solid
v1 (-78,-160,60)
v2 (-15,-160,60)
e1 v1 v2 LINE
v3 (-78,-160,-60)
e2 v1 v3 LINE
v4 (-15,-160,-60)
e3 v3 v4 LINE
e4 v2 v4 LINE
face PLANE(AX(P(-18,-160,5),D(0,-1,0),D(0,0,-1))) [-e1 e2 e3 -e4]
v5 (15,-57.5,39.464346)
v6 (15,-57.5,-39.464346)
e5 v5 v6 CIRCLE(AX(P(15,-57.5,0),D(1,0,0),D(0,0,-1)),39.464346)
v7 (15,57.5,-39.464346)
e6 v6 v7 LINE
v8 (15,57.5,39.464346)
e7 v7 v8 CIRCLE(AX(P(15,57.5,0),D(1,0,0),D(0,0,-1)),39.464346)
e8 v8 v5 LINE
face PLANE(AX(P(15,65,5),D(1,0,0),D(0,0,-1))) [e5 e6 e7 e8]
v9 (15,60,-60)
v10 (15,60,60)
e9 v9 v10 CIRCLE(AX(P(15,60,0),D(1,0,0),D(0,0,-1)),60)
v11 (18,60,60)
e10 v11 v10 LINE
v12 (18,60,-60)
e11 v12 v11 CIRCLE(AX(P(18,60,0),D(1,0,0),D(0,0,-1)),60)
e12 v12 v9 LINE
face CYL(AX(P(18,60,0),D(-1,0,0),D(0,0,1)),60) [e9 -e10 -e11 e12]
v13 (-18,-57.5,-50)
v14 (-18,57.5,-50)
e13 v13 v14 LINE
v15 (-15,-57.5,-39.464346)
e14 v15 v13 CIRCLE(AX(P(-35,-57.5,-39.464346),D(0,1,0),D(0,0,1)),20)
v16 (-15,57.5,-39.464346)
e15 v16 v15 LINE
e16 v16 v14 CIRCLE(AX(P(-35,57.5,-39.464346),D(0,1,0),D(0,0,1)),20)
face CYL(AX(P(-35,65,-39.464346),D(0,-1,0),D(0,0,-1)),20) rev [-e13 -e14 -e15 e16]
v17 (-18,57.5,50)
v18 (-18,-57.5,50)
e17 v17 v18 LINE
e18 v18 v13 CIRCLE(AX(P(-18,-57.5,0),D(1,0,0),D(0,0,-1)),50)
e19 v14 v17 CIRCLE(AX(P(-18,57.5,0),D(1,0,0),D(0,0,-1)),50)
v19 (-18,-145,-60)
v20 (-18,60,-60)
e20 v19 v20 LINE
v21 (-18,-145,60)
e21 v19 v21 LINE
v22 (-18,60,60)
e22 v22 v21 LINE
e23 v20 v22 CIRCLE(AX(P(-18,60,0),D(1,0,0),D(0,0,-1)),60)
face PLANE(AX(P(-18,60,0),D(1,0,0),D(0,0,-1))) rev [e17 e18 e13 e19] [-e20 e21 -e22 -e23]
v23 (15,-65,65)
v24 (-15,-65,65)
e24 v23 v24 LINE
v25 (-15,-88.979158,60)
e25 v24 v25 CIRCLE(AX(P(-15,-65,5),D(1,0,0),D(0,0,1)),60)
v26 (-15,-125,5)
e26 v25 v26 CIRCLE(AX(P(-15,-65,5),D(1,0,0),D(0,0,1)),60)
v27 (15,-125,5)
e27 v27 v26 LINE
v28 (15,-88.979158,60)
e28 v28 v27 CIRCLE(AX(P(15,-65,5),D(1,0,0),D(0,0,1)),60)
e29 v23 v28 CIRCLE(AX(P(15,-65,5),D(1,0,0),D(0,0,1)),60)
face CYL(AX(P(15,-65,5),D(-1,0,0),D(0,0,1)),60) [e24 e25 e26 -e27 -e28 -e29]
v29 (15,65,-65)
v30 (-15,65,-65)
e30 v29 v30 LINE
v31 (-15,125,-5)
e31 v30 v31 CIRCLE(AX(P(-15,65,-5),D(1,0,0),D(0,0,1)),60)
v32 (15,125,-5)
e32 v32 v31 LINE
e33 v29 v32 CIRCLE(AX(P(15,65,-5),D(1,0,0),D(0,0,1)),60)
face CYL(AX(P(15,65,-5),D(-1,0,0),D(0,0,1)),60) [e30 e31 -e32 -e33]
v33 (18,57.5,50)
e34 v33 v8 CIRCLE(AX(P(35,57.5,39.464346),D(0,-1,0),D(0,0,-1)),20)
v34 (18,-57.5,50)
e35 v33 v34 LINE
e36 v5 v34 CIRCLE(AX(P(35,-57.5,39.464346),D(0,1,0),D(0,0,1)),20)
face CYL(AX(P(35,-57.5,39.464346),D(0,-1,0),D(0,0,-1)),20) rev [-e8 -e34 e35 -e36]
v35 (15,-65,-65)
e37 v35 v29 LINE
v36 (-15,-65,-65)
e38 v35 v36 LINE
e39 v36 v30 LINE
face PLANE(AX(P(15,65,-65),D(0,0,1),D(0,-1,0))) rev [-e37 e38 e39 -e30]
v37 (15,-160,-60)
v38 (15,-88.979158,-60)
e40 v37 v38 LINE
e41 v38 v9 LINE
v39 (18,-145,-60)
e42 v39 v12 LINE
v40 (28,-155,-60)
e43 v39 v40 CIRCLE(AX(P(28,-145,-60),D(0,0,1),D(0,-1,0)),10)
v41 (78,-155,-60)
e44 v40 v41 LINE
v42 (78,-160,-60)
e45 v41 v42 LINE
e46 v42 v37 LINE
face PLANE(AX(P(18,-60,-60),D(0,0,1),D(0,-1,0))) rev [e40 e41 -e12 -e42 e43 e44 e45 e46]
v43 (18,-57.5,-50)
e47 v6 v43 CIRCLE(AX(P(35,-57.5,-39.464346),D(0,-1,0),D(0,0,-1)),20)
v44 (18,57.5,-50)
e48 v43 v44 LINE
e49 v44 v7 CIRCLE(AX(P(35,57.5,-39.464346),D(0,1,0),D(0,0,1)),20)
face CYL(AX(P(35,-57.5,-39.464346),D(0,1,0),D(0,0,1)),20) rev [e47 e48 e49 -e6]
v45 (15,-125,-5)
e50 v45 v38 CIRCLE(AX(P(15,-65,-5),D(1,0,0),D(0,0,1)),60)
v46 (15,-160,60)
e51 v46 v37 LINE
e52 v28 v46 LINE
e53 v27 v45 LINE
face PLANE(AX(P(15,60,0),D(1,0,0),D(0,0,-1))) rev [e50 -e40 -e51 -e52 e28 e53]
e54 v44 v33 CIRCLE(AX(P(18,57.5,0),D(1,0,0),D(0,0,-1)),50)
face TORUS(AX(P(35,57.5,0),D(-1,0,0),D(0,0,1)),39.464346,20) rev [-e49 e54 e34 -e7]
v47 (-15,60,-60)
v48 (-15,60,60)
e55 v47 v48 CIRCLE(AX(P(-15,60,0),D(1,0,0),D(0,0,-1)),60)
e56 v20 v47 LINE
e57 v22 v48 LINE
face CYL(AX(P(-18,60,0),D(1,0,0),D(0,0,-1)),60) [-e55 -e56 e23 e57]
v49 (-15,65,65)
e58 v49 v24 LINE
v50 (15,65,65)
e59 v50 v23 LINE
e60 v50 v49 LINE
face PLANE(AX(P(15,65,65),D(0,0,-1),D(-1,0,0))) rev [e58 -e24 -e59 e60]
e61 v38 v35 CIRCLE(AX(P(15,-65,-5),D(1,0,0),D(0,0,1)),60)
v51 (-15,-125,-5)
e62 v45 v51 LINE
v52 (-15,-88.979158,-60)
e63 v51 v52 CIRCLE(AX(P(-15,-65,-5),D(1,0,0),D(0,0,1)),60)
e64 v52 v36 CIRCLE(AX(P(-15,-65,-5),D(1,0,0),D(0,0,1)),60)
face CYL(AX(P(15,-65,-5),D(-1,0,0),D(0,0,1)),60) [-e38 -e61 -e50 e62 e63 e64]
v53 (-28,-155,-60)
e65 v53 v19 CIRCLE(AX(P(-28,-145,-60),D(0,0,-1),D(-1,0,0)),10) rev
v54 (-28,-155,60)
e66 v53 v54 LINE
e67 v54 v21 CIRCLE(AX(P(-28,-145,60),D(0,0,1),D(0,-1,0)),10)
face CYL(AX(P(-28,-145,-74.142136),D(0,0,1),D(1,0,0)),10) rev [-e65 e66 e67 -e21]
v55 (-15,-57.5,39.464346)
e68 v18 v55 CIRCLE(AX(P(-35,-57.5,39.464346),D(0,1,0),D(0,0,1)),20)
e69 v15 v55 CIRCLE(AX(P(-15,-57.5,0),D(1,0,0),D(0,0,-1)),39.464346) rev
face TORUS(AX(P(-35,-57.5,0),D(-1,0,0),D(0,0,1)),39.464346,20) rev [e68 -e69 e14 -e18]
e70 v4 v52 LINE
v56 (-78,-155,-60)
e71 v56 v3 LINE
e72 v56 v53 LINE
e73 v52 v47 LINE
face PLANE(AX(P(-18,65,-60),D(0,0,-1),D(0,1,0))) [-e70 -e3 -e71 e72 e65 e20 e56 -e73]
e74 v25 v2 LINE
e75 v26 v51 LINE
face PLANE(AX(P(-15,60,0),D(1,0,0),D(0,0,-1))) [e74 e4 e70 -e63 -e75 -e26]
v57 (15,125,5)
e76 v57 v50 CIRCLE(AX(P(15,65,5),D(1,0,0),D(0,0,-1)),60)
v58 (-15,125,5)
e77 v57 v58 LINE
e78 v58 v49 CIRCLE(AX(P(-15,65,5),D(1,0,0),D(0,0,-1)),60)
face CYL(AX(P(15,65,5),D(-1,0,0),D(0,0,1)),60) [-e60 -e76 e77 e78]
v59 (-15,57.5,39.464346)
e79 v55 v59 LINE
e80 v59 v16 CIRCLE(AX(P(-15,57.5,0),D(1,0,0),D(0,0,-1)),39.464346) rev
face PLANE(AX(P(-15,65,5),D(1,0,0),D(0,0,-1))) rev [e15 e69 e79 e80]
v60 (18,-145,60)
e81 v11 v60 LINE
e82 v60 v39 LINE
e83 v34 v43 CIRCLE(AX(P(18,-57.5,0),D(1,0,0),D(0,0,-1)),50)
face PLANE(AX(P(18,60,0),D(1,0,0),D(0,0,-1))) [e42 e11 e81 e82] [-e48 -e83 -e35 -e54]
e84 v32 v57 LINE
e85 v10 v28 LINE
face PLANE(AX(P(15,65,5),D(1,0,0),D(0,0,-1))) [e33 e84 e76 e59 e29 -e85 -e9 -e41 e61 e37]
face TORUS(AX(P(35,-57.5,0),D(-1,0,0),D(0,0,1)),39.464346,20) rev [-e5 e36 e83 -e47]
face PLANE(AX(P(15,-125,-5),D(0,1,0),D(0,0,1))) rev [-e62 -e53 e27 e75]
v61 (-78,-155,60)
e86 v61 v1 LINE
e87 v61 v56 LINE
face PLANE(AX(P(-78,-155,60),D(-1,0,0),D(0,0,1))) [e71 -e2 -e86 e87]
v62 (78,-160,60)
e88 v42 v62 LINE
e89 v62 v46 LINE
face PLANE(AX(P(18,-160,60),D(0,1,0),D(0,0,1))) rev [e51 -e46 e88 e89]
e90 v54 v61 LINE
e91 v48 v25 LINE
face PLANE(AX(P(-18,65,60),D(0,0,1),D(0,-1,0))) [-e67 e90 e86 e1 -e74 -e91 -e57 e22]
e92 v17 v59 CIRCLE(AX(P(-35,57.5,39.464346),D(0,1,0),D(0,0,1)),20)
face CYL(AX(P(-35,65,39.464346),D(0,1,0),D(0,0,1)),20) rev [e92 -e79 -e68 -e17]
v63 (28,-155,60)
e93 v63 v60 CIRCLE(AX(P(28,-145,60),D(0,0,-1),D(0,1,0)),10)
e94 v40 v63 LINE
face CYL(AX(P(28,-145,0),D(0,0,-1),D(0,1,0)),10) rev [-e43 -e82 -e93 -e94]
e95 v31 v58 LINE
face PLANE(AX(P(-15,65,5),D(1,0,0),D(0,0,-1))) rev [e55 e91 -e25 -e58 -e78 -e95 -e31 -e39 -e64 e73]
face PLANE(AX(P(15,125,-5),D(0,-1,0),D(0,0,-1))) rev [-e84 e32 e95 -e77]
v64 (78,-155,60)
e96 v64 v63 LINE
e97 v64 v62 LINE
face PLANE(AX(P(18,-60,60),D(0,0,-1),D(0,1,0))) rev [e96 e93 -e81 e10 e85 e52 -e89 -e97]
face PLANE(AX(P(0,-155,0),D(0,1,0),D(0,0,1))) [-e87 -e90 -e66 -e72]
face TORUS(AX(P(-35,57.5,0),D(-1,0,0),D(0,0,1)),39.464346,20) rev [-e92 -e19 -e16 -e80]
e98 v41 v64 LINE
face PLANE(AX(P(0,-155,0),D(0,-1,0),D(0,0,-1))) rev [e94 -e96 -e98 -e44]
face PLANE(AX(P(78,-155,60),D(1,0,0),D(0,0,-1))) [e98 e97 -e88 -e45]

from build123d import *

# Parameters (mm, degrees)
BOSS_EXTRUDE1_DEPTH = 15
BOSS_EXTRUDE2_DEPTH = 3
FILLET1_R           = 20
SKETCH4_W           = 60
SKETCH4_H           = 120
BOSS_EXTRUDE3_DEPTH = 5
BOSS_EXTRUDE4_START = -30
BOSS_EXTRUDE4_DEPTH = 3
FILLET2_R           = 20
FILLET4_R           = 10
BOSS_EXTRUDE5_START = -5
BOSS_EXTRUDE5_DEPTH = 120


with BuildPart() as part:
    # Sketch1 → Boss-Extrude1 (new, symmetric)
    with BuildSketch(Plane(origin=(0, 0, 0), x_dir=(0, 0, -1), z_dir=(1, 0, 0))):
        with BuildLine():
            Line((5, 125), (-5, 125))
            ThreePointArc((-5, 125), (-47.426406871, 107.426406871), (-65, 65))
            Line((-65, 65), (-65, -65))
            ThreePointArc((-65, -65), (-47.426406871, -107.426406871), (-5, -125))
            Line((-5, -125), (5, -125))
            ThreePointArc((5, -125), (47.426406871, -107.426406871), (65, -65))
            Line((65, -65), (65, 65))
            ThreePointArc((65, 65), (47.426406871, 107.426406871), (5, 125))
        make_face()
    extrude(amount=BOSS_EXTRUDE1_DEPTH, both=True)

    # Sketch3 → Boss-Extrude2 (add)
    with BuildSketch(Plane(origin=(15, 0, 0), x_dir=(0, 0, -1), z_dir=(1, 0, 0))):
        with BuildLine():
            Line((-60, -60), (-60, 60))
            ThreePointArc((-60, 60), (0, 120), (60, 60))
            Line((60, 60), (60, -60))
            Line((60, -60), (60, -160))
            Line((60, -160), (-60, -160))
            Line((-60, -160), (-60, -60))
        make_face()
        with BuildLine():
            Line((-50, -57.5), (-50, 57.5))
            ThreePointArc((-50, 57.5), (0, 107.5), (50, 57.5))
            Line((50, 57.5), (50, -57.5))
            ThreePointArc((50, -57.5), (0, -107.5), (-50, -57.5))
        make_face(mode=Mode.SUBTRACT)
    extrude(amount=BOSS_EXTRUDE2_DEPTH)

    # Fillet1
    # the kernel refuses this fillet: 20 mm, written as the material it adds along each edge
    with BuildSketch(Plane(origin=(15, 57.5, -50), x_dir=(1, 0, 0), z_dir=(0, -1, 0)), Plane(origin=(15, -57.5, 50), x_dir=(1, 0, 0), z_dir=(0, 1, 0))) as fillet1_piece_1:
        with BuildLine():
            CenterArc((20, 10.535653753), FILLET1_R, 180, 31.788330617)
            Line((0, 10.535653753), (-0.4, 10.535653753))
            Line((-0.4, 10.535653753), (-0.4, 0))
            Line((-0.4, 0), (0, -0.4))
            ThreePointArc((0, -0.4), (1.5, -0.4), (2.66, -0.210713075))
            Line((2.66, -0.210713075), (3, 0))
        make_face()
    extrude(amount=115)
    with BuildSketch(Plane(origin=(15, -57.5, 0), x_dir=(0, 0, -1), z_dir=(0, 1, 0))) as fillet1_piece_2:
        with BuildLine():
            CenterArc((39.464346247, -20), FILLET1_R, 58.211669383, 31.788330617)
            Line((39.464346247, 0), (39.464346247, 0.4))
            Line((39.464346247, 0.4), (50, 0.4))
            Line((50, 0.4), (50.4, 0))
            ThreePointArc((50.4, 0), (50.4, -1.5), (50.210713075, -2.66))
            Line((50.210713075, -2.66), (50, -3))
        make_face()
    revolve(axis=Axis((15, -57.5, 0), (-1, 0, 0)), revolution_arc=180)
    with BuildSketch(Plane(origin=(15, 57.5, 0), x_dir=(0, 0, 1), z_dir=(0, -1, 0))) as fillet1_piece_3:
        with BuildLine():
            CenterArc((39.464346247, -20), FILLET1_R, 58.211669383, 31.788330617)
            Line((39.464346247, 0), (39.464346247, 0.4))
            Line((39.464346247, 0.4), (50, 0.4))
            Line((50, 0.4), (50.4, 0))
            ThreePointArc((50.4, 0), (50.4, -1.5), (50.210713075, -2.66))
            Line((50.210713075, -2.66), (50, -3))
        make_face()
    revolve(axis=Axis((15, 57.5, 0), (-1, 0, 0)), revolution_arc=180)

    # Sketch4 → Boss-Extrude3 (add)
    with BuildSketch(Plane.XZ.offset(160)):
        with Locations((48, 0)):
            Rectangle(SKETCH4_W, SKETCH4_H)
        with Locations((-48, 0)):
            Rectangle(SKETCH4_W, SKETCH4_H)
    extrude(amount=-BOSS_EXTRUDE3_DEPTH)


with BuildPart() as boss_extrude3_piece_1:
    # of the separate pieces the step leaves, piece 1, a body of its own (boss_extrude3_pieces)
    add(part.part.solids().sort_by_distance((18, 57.5, 50))[0])

    # Sketch3<4> → Boss-Extrude4 (add)
    with BuildSketch(Plane(origin=(15, 0, 0), x_dir=(0, 0, -1), z_dir=(1, 0, 0)).offset(BOSS_EXTRUDE4_START)):
        with BuildLine():
            Line((-60, -60), (-60, 60))
            ThreePointArc((-60, 60), (0, 120), (60, 60))
            Line((60, 60), (60, -60))
            Line((60, -60), (60, -160))
            Line((60, -160), (-60, -160))
            Line((-60, -160), (-60, -60))
        make_face()
        with BuildLine():
            Line((-50, -57.5), (-50, 57.5))
            ThreePointArc((-50, 57.5), (0, 107.5), (50, 57.5))
            Line((50, 57.5), (50, -57.5))
            ThreePointArc((50, -57.5), (0, -107.5), (-50, -57.5))
        make_face(mode=Mode.SUBTRACT)
    extrude(amount=-BOSS_EXTRUDE4_DEPTH)

    # Fillet2
    # the kernel refuses this fillet: 20 mm, written as the material it adds along each edge
    with BuildSketch(Plane(origin=(-15, -57.5, 0), x_dir=(0, 0, -1), z_dir=(0, 1, 0))) as fillet2_piece_1:
        with BuildLine():
            CenterArc((39.464346247, 20), FILLET2_R, 270, 31.788330617)
            Line((39.464346247, 0), (39.464346247, -0.4))
            Line((39.464346247, -0.4), (50, -0.4))
            Line((50, -0.4), (50.4, 0))
            ThreePointArc((50.4, 0), (50.4, 1.5), (50.210713075, 2.66))
            Line((50.210713075, 2.66), (50, 3))
        make_face()
    revolve(axis=Axis((-15, -57.5, 0), (-1, 0, 0)), revolution_arc=180)
    with BuildSketch(Plane(origin=(-15, -57.5, 50), x_dir=(-1, 0, 0), z_dir=(0, 1, 0)), Plane(origin=(-15, 57.5, -50), x_dir=(-1, 0, 0), z_dir=(0, -1, 0))) as fillet2_piece_2:
        with BuildLine():
            CenterArc((20, -10.535653753), FILLET2_R, 148.211669383, 31.788330617)
            Line((0, -10.535653753), (-0.4, -10.535653753))
            Line((-0.4, -10.535653753), (-0.4, 0))
            Line((-0.4, 0), (0, 0.4))
            ThreePointArc((0, 0.4), (1.5, 0.4), (2.66, 0.210713075))
            Line((2.66, 0.210713075), (3, 0))
        make_face()
    extrude(amount=115)
    with BuildSketch(Plane(origin=(-15, 57.5, 0), x_dir=(0, 0, 1), z_dir=(0, -1, 0))) as fillet2_piece_3:
        with BuildLine():
            CenterArc((39.464346247, 20), FILLET2_R, 270, 31.788330617)
            Line((39.464346247, 0), (39.464346247, -0.4))
            Line((39.464346247, -0.4), (50, -0.4))
            Line((50, -0.4), (50.4, 0))
            ThreePointArc((50.4, 0), (50.4, 1.5), (50.210713075, 2.66))
            Line((50.210713075, 2.66), (50, 3))
        make_face()
    revolve(axis=Axis((-15, 57.5, 0), (-1, 0, 0)), revolution_arc=180)

    # Fillet4
    fillet4_edges = [boss_extrude3_piece_1.edges().sort_by_distance(p)[0] for p in [
        (18, -155, 0),
    ]]
    fillet(fillet4_edges, radius=FILLET4_R)



with BuildPart() as boss_extrude3_piece_2:
    # of the separate pieces the step leaves, piece 2, a body of its own (boss_extrude3_pieces)
    add(part.part.solids().sort_by_distance((-18, -160, 60))[0])


with BuildPart() as boss_extrude3_piece_1_1:
    add(boss_extrude3_piece_1.part)

    add(boss_extrude3_piece_2.part)  # Boss-Extrude5 merges Boss-Extrude3 piece 2
    # Sketch5 → Boss-Extrude5 (add)
    with BuildSketch(Plane.XY.offset(65).offset(BOSS_EXTRUDE5_START)):
        with BuildLine():
            Line((-28, -155), (-18, -155))
            Line((-18, -155), (-18, -145))
            ThreePointArc((-18, -145), (-20.928932188, -152.071067812), (-28, -155))
        make_face()
    extrude(amount=-BOSS_EXTRUDE5_DEPTH)


solid = boss_extrude3_piece_1_1.part
